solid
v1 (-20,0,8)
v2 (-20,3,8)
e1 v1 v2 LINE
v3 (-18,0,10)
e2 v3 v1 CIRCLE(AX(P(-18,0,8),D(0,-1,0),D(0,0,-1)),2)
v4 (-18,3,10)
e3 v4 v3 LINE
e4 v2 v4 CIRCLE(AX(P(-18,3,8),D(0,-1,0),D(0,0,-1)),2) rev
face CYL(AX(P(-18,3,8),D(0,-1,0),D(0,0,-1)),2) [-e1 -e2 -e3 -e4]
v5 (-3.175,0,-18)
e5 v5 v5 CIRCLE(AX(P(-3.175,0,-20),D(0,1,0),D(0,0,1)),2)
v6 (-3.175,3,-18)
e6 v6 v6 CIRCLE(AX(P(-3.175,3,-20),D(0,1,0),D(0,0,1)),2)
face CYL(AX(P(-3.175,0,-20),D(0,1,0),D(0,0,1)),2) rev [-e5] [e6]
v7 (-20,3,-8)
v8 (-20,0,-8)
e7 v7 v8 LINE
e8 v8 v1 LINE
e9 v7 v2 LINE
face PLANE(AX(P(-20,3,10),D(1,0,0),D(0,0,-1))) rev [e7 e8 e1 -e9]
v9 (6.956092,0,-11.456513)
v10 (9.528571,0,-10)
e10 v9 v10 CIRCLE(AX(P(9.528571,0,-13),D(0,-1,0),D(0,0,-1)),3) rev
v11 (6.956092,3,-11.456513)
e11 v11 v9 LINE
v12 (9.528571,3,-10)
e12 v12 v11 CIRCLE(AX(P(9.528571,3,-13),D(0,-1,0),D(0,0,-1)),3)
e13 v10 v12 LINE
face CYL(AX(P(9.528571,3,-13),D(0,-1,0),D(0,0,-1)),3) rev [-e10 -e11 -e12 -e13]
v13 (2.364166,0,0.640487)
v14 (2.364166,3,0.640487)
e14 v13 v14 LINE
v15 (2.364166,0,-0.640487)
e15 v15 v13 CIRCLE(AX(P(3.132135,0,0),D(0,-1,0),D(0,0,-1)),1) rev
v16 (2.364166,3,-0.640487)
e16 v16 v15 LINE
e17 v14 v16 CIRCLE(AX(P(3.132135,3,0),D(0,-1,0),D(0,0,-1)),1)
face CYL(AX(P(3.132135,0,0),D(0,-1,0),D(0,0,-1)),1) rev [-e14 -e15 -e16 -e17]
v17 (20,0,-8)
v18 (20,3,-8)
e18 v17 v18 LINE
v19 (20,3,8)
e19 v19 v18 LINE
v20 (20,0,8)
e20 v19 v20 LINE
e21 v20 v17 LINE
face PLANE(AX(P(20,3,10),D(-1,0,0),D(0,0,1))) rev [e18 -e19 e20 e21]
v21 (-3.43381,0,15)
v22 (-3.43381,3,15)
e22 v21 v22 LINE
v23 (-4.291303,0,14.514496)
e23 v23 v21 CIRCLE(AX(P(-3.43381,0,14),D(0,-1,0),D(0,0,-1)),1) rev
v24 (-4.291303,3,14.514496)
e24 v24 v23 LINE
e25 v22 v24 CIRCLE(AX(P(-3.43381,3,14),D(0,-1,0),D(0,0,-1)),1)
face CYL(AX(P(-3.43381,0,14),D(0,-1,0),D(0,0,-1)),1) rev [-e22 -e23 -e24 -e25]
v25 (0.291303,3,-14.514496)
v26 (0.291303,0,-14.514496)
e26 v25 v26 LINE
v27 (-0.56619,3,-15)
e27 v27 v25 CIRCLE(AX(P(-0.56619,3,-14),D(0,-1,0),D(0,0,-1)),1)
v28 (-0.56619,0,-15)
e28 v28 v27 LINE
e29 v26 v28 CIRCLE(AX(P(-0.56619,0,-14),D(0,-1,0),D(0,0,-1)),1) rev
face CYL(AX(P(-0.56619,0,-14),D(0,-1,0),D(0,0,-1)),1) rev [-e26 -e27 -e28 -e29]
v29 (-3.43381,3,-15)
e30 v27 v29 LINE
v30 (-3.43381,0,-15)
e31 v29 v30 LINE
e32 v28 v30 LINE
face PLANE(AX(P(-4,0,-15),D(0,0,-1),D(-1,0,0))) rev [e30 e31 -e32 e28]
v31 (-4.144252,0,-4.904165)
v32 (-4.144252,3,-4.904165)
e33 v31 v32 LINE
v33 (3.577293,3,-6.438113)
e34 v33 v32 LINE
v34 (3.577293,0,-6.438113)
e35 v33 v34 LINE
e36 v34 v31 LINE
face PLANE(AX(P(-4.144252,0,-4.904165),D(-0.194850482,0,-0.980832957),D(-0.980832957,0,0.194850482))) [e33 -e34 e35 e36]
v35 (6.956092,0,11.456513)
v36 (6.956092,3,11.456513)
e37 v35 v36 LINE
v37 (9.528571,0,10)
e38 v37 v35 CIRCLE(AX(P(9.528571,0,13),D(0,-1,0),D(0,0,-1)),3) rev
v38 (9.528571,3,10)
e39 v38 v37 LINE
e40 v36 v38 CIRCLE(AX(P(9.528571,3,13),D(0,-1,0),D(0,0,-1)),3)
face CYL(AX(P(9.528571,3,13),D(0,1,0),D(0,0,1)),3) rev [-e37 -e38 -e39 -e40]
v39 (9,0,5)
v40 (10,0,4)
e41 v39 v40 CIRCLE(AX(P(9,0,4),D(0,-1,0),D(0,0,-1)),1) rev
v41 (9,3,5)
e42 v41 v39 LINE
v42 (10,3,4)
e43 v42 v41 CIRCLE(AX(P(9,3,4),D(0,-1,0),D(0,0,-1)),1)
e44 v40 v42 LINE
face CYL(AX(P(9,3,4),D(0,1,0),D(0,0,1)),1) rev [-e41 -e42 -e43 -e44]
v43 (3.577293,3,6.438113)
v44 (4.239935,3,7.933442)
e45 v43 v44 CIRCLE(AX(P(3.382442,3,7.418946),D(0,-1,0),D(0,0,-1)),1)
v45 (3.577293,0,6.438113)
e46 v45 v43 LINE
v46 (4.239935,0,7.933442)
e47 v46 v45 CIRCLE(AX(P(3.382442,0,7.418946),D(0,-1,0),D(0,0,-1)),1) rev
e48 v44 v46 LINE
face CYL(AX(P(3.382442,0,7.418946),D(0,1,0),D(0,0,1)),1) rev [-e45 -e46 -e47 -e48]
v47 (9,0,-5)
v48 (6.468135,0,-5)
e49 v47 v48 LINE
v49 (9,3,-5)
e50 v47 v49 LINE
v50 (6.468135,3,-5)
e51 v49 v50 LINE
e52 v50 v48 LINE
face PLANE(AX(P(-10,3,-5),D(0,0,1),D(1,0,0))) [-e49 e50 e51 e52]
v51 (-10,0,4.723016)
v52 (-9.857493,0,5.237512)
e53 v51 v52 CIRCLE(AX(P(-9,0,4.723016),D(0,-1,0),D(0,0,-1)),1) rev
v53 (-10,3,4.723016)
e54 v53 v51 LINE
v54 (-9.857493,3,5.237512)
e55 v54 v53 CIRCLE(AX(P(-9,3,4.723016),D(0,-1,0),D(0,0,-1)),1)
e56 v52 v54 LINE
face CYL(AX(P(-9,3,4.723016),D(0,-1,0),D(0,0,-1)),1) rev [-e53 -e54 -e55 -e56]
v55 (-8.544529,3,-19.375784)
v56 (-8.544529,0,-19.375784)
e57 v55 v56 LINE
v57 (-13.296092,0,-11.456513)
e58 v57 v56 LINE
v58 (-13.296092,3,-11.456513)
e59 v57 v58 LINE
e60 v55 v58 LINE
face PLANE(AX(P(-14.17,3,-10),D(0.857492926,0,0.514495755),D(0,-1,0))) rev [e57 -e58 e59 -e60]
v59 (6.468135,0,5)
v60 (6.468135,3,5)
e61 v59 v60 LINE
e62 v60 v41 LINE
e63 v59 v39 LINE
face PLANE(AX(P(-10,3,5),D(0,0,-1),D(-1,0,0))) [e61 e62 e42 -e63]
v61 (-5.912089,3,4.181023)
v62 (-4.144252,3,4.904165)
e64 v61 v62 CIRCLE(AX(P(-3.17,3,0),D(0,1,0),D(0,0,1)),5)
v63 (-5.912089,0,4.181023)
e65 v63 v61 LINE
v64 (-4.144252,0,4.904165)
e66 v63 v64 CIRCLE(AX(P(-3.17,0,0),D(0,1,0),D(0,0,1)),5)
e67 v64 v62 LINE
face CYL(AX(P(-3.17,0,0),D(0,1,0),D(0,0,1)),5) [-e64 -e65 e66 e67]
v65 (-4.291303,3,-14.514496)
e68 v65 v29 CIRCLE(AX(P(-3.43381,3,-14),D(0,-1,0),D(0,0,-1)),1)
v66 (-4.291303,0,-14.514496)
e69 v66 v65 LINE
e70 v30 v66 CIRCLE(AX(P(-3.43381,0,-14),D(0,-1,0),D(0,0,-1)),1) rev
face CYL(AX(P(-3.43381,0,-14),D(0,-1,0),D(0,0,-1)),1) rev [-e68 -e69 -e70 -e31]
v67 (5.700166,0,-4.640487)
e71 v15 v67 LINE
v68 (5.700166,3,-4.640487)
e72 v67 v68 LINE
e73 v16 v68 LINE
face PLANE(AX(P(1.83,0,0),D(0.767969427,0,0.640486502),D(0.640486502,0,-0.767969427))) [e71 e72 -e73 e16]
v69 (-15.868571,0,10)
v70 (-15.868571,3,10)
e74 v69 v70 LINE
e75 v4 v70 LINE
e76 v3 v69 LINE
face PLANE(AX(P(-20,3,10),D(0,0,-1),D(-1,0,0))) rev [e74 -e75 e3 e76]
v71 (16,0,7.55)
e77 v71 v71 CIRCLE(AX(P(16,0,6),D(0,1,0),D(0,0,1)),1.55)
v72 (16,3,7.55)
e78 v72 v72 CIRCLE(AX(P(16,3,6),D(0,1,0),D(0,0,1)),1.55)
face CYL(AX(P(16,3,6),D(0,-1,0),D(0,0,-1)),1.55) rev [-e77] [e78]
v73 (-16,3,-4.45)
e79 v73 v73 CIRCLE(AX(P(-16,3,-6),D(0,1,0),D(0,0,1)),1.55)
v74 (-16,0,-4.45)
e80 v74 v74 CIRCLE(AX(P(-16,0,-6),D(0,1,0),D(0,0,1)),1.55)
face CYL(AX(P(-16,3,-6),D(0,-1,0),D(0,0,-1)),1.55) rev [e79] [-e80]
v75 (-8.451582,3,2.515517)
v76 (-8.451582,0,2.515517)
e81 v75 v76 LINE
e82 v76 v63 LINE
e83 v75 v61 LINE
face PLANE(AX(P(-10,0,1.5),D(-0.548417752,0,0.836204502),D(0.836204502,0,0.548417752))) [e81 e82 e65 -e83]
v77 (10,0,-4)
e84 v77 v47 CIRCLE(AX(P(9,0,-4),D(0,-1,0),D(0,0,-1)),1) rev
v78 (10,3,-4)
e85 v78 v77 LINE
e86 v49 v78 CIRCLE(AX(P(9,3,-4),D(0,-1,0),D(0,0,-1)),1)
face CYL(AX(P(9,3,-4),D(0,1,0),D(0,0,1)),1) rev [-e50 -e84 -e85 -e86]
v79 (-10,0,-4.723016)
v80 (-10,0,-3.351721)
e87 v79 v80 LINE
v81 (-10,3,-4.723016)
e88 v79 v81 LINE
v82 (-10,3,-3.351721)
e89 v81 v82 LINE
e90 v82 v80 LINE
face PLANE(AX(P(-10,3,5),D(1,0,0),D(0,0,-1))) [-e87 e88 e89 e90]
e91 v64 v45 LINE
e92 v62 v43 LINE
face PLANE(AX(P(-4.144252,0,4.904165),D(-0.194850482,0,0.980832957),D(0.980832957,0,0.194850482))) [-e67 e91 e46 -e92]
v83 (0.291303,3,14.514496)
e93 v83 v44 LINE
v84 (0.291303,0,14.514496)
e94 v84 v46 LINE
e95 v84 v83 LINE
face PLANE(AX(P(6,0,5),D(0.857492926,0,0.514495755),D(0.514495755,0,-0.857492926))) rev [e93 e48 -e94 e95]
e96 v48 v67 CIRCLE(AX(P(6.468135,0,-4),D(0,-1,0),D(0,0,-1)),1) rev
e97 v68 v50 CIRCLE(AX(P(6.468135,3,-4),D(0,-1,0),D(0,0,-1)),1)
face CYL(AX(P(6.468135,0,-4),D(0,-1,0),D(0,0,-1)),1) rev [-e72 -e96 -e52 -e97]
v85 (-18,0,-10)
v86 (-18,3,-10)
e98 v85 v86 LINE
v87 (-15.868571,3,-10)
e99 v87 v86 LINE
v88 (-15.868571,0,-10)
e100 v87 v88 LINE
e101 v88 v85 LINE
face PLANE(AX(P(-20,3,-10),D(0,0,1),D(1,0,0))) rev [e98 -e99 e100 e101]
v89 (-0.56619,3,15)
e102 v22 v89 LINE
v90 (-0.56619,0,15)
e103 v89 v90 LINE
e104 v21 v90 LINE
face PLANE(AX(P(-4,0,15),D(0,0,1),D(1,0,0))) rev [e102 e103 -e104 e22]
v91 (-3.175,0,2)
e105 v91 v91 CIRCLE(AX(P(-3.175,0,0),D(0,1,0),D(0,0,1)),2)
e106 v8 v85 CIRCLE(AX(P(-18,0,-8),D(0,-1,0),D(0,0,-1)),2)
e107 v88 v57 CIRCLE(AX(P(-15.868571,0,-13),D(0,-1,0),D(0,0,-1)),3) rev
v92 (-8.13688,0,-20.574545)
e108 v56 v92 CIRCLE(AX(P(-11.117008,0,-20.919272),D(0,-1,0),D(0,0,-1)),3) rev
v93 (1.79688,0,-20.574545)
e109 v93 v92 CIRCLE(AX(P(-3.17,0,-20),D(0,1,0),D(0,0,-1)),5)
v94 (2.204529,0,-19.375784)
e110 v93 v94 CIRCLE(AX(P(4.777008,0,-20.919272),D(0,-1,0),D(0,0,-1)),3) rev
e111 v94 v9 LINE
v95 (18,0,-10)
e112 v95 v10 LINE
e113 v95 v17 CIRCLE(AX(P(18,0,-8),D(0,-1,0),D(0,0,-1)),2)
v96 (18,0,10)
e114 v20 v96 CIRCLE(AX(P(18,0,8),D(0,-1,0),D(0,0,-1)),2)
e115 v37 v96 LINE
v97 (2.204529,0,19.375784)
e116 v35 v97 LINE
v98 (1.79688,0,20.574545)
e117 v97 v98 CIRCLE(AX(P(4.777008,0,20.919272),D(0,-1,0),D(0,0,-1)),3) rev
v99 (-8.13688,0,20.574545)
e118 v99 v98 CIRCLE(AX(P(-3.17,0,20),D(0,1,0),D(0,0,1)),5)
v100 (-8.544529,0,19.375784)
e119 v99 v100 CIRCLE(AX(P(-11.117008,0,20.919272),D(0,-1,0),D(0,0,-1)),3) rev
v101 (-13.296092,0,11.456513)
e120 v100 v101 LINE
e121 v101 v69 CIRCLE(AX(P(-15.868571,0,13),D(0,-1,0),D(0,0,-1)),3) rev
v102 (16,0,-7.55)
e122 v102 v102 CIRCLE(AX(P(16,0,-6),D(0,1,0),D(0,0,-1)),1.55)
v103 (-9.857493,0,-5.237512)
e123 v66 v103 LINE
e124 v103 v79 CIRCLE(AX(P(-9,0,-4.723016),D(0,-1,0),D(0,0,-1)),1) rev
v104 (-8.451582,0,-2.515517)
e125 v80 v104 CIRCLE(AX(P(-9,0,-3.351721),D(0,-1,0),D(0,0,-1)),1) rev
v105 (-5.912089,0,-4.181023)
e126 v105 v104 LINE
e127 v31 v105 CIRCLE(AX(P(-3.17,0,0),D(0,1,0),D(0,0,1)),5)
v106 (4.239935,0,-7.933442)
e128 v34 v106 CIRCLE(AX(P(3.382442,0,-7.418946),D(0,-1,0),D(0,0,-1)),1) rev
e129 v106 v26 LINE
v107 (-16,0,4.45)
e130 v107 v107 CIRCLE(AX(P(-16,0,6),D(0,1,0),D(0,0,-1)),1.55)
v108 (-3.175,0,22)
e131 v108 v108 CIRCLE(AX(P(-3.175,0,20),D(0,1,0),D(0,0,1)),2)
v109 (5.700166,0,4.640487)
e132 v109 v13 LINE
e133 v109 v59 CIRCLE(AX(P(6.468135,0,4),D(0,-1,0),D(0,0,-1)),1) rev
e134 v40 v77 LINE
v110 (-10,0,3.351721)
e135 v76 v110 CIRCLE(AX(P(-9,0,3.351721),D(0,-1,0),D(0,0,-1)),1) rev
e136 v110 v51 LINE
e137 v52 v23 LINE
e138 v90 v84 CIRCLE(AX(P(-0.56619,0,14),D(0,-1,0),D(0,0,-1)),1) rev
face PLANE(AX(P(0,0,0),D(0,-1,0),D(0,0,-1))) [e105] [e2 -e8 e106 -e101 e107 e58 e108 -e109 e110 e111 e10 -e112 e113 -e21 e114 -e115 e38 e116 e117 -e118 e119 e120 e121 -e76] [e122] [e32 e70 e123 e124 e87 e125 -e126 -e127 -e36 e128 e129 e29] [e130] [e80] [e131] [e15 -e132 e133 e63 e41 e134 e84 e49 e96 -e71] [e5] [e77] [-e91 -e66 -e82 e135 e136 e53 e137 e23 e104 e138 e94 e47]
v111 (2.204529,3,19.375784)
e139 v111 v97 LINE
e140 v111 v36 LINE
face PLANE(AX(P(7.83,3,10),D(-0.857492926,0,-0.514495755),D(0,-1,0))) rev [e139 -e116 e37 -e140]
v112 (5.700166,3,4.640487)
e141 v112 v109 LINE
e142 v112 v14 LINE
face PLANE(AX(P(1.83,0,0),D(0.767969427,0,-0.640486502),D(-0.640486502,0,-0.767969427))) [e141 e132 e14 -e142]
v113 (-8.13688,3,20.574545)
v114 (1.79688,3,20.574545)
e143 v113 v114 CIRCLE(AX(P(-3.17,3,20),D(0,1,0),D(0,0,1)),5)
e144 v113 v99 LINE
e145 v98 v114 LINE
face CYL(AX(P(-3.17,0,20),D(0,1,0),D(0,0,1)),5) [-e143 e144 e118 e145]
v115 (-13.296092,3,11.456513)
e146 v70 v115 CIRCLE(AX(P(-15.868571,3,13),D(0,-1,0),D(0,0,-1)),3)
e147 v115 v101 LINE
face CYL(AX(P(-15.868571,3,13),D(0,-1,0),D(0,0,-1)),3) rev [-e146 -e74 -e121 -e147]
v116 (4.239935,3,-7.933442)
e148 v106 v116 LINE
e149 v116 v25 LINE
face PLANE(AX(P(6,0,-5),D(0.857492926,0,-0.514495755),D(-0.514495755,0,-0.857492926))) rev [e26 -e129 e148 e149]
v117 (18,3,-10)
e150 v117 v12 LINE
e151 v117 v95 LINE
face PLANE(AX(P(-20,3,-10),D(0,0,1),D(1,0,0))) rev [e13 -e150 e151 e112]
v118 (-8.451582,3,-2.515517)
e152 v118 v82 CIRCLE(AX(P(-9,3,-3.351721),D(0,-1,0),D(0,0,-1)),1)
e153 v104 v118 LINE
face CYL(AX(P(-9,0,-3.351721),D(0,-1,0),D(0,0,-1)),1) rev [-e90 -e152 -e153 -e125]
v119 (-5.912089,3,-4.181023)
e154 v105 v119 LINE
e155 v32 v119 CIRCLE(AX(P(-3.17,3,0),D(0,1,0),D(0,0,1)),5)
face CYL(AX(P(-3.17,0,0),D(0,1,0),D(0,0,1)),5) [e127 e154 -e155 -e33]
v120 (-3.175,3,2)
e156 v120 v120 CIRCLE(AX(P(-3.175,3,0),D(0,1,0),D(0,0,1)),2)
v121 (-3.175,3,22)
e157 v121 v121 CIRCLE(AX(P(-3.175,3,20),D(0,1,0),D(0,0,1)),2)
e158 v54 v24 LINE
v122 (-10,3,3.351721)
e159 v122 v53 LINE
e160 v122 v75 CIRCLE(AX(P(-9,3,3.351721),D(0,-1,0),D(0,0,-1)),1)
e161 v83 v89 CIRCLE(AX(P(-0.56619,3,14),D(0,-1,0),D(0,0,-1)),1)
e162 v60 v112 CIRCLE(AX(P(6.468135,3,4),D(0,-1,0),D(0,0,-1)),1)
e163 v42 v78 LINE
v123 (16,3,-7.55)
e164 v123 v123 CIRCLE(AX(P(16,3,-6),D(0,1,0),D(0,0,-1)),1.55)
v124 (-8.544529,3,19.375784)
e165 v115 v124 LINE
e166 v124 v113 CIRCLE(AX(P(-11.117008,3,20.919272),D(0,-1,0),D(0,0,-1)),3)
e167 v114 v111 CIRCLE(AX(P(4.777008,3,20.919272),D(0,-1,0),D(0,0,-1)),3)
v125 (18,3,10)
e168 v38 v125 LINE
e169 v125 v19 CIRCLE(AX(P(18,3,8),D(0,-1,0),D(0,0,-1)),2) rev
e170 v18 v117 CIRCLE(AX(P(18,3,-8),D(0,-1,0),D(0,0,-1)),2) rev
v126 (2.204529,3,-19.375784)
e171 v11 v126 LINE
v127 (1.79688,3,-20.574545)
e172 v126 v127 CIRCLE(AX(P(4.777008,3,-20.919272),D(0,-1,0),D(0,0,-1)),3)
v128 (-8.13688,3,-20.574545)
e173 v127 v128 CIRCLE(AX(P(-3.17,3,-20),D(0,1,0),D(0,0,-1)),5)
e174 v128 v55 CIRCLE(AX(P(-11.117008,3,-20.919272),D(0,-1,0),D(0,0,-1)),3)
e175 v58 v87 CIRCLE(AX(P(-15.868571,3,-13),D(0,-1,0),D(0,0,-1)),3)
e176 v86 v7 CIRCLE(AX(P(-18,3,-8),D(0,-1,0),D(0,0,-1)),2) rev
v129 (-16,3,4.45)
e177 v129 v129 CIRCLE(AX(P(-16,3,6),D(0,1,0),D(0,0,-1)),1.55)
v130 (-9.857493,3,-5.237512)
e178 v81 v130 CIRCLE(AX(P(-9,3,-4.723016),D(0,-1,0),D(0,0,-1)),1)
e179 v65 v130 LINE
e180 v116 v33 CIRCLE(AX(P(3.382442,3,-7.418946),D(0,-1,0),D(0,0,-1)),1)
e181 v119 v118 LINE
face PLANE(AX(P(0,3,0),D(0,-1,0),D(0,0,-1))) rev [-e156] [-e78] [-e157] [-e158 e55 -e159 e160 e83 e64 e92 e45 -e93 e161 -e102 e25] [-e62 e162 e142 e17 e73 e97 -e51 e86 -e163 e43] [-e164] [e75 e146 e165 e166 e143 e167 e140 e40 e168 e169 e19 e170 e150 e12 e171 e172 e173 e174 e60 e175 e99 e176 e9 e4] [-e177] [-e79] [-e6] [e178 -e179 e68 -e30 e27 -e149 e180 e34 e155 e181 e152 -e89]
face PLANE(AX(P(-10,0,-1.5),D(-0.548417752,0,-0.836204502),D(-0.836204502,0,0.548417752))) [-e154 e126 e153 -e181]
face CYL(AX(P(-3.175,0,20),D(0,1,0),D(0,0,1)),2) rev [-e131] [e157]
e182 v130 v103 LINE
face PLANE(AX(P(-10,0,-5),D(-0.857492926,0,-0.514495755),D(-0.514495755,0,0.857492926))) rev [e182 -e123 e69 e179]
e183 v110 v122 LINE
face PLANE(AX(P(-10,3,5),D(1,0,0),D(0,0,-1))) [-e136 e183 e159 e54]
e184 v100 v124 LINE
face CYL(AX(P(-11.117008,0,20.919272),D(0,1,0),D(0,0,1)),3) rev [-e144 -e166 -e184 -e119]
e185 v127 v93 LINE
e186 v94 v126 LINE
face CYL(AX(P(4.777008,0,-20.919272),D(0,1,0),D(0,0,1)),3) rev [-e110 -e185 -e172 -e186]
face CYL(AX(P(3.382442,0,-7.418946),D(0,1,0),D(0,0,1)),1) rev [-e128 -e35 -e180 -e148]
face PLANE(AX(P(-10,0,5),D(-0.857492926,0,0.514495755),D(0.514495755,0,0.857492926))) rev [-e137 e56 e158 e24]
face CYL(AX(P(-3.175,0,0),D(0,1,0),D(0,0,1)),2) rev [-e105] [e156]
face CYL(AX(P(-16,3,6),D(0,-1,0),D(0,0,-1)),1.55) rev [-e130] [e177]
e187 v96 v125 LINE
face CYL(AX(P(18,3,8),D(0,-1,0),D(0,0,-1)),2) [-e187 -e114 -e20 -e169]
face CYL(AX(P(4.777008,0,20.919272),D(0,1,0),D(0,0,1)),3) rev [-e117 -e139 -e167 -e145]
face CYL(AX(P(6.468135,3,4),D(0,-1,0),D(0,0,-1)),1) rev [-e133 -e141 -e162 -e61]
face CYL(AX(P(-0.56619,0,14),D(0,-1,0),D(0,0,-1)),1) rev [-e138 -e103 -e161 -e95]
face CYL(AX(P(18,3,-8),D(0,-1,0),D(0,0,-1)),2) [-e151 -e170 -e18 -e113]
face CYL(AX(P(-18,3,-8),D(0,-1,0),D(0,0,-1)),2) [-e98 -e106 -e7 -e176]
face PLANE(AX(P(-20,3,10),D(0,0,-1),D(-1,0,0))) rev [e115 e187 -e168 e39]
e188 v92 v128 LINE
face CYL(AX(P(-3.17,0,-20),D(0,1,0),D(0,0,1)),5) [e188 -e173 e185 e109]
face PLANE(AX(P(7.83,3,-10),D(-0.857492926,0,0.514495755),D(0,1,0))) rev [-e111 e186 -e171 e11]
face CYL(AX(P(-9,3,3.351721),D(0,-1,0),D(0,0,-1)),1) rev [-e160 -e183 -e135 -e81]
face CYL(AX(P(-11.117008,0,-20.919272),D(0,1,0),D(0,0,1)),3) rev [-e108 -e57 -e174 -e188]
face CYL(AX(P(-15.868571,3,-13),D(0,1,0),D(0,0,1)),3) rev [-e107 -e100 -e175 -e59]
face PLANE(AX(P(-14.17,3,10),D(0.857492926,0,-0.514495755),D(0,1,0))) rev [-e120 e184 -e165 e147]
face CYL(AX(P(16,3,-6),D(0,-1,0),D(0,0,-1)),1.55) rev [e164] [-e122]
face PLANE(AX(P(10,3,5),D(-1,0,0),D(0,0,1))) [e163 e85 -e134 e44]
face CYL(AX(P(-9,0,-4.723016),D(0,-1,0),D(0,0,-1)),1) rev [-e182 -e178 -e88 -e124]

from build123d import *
from OCP.BRepFilletAPI import BRepFilletAPI_MakeChamfer

# Parameters (mm, degrees)
SKETCH_1_W           = 40
SKETCH_1_H           = 20
SKETCH_1_R           = 1.55
SKETCH_1_W_2         = 20
SKETCH_1_H_2         = 10
EXTRUDE_1_DEPTH      = 3
SKETCH_2_R           = 2
EXTRUDE_2_DEPTH      = 3
FILLET_1_R           = 2
SKETCH_3_W           = 10
SKETCH_3_H           = 10
CUT_EXTRUDE_1_DEPTH  = 33.155870382
CHAMFER_1_SIZE       = 6
CHAMFER_1_SIZE_2     = 10
FILLET_2_OUTLINE_R   = 2
FILLET_2_OUTLINE_R_2 = 1.55
FILLET_2_OUTLINE_W   = 20
FILLET_2_OUTLINE_H   = 10
FILLET_2_DEPTH       = 3
CUT_EXTRUDE_2_DEPTH  = 33.155870382
SKETCH_5_R           = 2
EXTRUDE_3_DEPTH      = 3
FILLET_3_R           = 1
SKETCH_6_R           = 2
EXTRUDE_4_DEPTH      = 3
SKETCH_7_R           = 2
CUT_EXTRUDE_3_DEPTH  = 33.155870382


with BuildPart() as part:
    # 草图1 → 凸台-拉伸1 (new body)
    with BuildSketch(Plane(origin=(0, 0, 0), x_dir=(1, 0, 0), z_dir=(0, 1, 0))):
        Rectangle(SKETCH_1_W, SKETCH_1_H)
        with Locations(Location((-16, 6, 0), (0, 0, 270))):
            Circle(SKETCH_1_R, mode=Mode.SUBTRACT)
        with Locations(Location((16, 6, 0), (0, 0, 90))):
            Circle(SKETCH_1_R, mode=Mode.SUBTRACT)
        with Locations(Location((16, -6, 0), (0, 0, 270))):
            Circle(SKETCH_1_R, mode=Mode.SUBTRACT)
        with Locations(Location((-16, -6, 0), (0, 0, 90))):
            Circle(SKETCH_1_R, mode=Mode.SUBTRACT)
        Rectangle(SKETCH_1_W_2, SKETCH_1_H_2, mode=Mode.SUBTRACT)
    extrude(amount=EXTRUDE_1_DEPTH)

    # 草图2 → 凸台-拉伸2 (add, through all)
    with BuildSketch(Plane(origin=(0, 3, 0), x_dir=(1, 0, 0), z_dir=(0, 1, 0))):
        with BuildLine():
            Line((-8.17, 20), (-8.17, -20))
            ThreePointArc((-8.17, -20), (-3.17, -25), (1.83, -20))
            Line((1.83, -20), (1.83, 20))
            ThreePointArc((1.83, 20), (-3.17, 25), (-8.17, 20))
        make_face()
        with Locations(Location((-3.17, 20, 0), (0, 0, 270))):
            Circle(SKETCH_2_R, mode=Mode.SUBTRACT)
        with Locations(Location((-3.17, -20, 0), (0, 0, 270))):
            Circle(SKETCH_2_R, mode=Mode.SUBTRACT)
    extrude(amount=-EXTRUDE_2_DEPTH)

    # 圆角1
    fillet_1_edges = [part.edges().sort_by_distance(p)[0] for p in [
        (20, 1.5, 10),
        (-20, 1.5, 10),
        (-20, 1.5, -10),
        (20, 1.5, -10),
    ]]
    fillet(fillet_1_edges, radius=FILLET_1_R)

    # 草图3 → 切除-拉伸1 (cut, through all)
    with BuildSketch(Plane(origin=(0, 3, 0), x_dir=(1, 0, 0), z_dir=(0, 1, 0))):
        with Locations((-3.17, 0)):
            Rectangle(SKETCH_3_W, SKETCH_3_H)
    extrude(amount=-CUT_EXTRUDE_1_DEPTH, mode=Mode.SUBTRACT)

    # 倒角1
    chamfer_1_edges_1 = [part.edges().sort_by_distance(p)[0] for p in [
        (-8.17, 1.5, 10),
    ]]
    chamfer_1_side_1 = [part.faces().sort_by_distance(p)[0] for p in [
        (-8.29, 1.5, 10),
    ]]
    chamfer_1_edges_2 = [part.edges().sort_by_distance(p)[0] for p in [
        (1.83, 1.5, 10),
    ]]
    chamfer_1_side_2 = [part.faces().sort_by_distance(p)[0] for p in [
        (1.95, 1.5, 10),
    ]]
    chamfer_1_edges_3 = [part.edges().sort_by_distance(p)[0] for p in [
        (1.83, 1.5, -10),
    ]]
    chamfer_1_side_3 = [part.faces().sort_by_distance(p)[0] for p in [
        (1.83, 1.5, -10.12),
    ]]
    chamfer_1_edges_4 = [part.edges().sort_by_distance(p)[0] for p in [
        (-8.17, 1.5, -10),
    ]]
    chamfer_1_side_4 = [part.faces().sort_by_distance(p)[0] for p in [
        (-8.29, 1.5, -10),
    ]]
    chamfer_1 = BRepFilletAPI_MakeChamfer(part.part.solid().wrapped)
    for e in chamfer_1_edges_1:
        chamfer_1.Add(CHAMFER_1_SIZE - 0.0001, CHAMFER_1_SIZE_2 - 0.0001, e.wrapped, chamfer_1_side_1[0].wrapped)
    for e in chamfer_1_edges_2:
        chamfer_1.Add(CHAMFER_1_SIZE - 0.0001, CHAMFER_1_SIZE_2 - 0.0001, e.wrapped, chamfer_1_side_2[0].wrapped)
    for e in chamfer_1_edges_3:
        chamfer_1.Add(CHAMFER_1_SIZE_2 - 0.0001, CHAMFER_1_SIZE - 0.0001, e.wrapped, chamfer_1_side_3[0].wrapped)
    for e in chamfer_1_edges_4:
        chamfer_1.Add(CHAMFER_1_SIZE - 0.0001, CHAMFER_1_SIZE_2 - 0.0001, e.wrapped, chamfer_1_side_4[0].wrapped)
    add(Compound.cast(chamfer_1.Shape()), mode=Mode.REPLACE)  # a hair under: the kernel refuses the full size

    # 圆角2: read off the stored shape, not the designer's step
    # 圆角2 outline → 圆角2 (add)
    with BuildSketch(Plane(origin=(0, 0, 0), x_dir=(1, 0, 0), z_dir=(0, 1, 0))):
        with BuildLine():
            ThreePointArc((18, -10), (19.414213562, -9.414213562), (20, -8))
            Line((20, -8), (20, 8))
            ThreePointArc((20, 8), (19.414213562, 9.414213562), (18, 10))
            Line((18, 10), (9.528571137, 10))
            ThreePointArc((9.528571137, 10), (8.050474692, 10.38940028), (6.95609236, 11.456512734))
            Line((6.95609236, 11.456512734), (2.204529459, 19.375784235))
            ThreePointArc((2.204529459, 19.375784235), (1.9367411, 19.953413027), (1.796880148, 20.574544688))
            ThreePointArc((1.796880148, 20.574544688), (-3.17, 25), (-8.136880148, 20.574544688))
            ThreePointArc((-8.136880148, 20.574544688), (-8.2767411, 19.953413027), (-8.544529459, 19.375784235))
            Line((-8.544529459, 19.375784235), (-13.29609236, 11.456512734))
            ThreePointArc((-13.29609236, 11.456512734), (-14.390474692, 10.38940028), (-15.868571137, 10))
            Line((-15.868571137, 10), (-18, 10))
            ThreePointArc((-18, 10), (-19.414213562, 9.414213562), (-20, 8))
            Line((-20, 8), (-20, -8))
            ThreePointArc((-20, -8), (-19.414213562, -9.414213562), (-18, -10))
            Line((-18, -10), (-15.868571137, -10))
            ThreePointArc((-15.868571137, -10), (-14.390474692, -10.38940028), (-13.29609236, -11.456512734))
            Line((-13.29609236, -11.456512734), (-8.544529459, -19.375784235))
            ThreePointArc((-8.544529459, -19.375784235), (-8.2767411, -19.953413027), (-8.136880148, -20.574544688))
            ThreePointArc((-8.136880148, -20.574544688), (-3.17, -25), (1.796880148, -20.574544688))
            ThreePointArc((1.796880148, -20.574544688), (1.9367411, -19.953413027), (2.204529459, -19.375784235))
            Line((2.204529459, -19.375784235), (6.95609236, -11.456512734))
            ThreePointArc((6.95609236, -11.456512734), (8.050474692, -10.38940028), (9.528571137, -10))
            Line((9.528571137, -10), (18, -10))
        make_face()
        with Locations((-3.17, -20)):
            Circle(FILLET_2_OUTLINE_R, mode=Mode.SUBTRACT)
        with Locations((-16, -6)):
            Circle(FILLET_2_OUTLINE_R_2, mode=Mode.SUBTRACT)
        with Locations((16, -6)):
            Circle(FILLET_2_OUTLINE_R_2, mode=Mode.SUBTRACT)
        with Locations((-16, 6)):
            Circle(FILLET_2_OUTLINE_R_2, mode=Mode.SUBTRACT)
        with Locations((-3.17, 20)):
            Circle(FILLET_2_OUTLINE_R, mode=Mode.SUBTRACT)
        Rectangle(FILLET_2_OUTLINE_W, FILLET_2_OUTLINE_H, mode=Mode.SUBTRACT)
        with Locations((16, 6)):
            Circle(FILLET_2_OUTLINE_R_2, mode=Mode.SUBTRACT)
    extrude(amount=FILLET_2_DEPTH)

    # 草图4 → 切除-拉伸2 (cut, through all)
    with BuildSketch(Plane(origin=(0, 3, 0), x_dir=(1, 0, 0), z_dir=(0, 1, 0))):
        Polygon((-10, 5), (-4, 15), (0, 15), (6, 5), align=None)
        Polygon((-10, -5), (6, -5), (0, -15), (-4, -15), align=None)
    extrude(amount=-CUT_EXTRUDE_2_DEPTH, mode=Mode.SUBTRACT)

    # 草图5 → 凸台-拉伸3 (add, through all)
    with BuildSketch(Plane(origin=(0, 3, 0), x_dir=(1, 0, 0), z_dir=(0, 1, 0))):
        with BuildLine():
            Line((-10, 1.5), (-5.912088761, 4.18102251))
            ThreePointArc((-5.912088761, 4.18102251), (-5.06302182, 4.627793036), (-4.144252411, 4.904164785))
            Line((-4.144252411, 4.904164785), (4.971008489, 6.714985851))
            Line((4.971008489, 6.714985851), (6, 5))
            Line((6, 5), (1.83, 0))
            Line((1.83, 0), (6, -5))
            Line((6, -5), (4.971008489, -6.714985851))
            Line((4.971008489, -6.714985851), (-4.144252411, -4.904164785))
            ThreePointArc((-4.144252411, -4.904164785), (-5.06302182, -4.627793036), (-5.912088761, -4.18102251))
            Line((-5.912088761, -4.18102251), (-10, -1.5))
            Line((-10, -1.5), (-10, 1.5))
        make_face()
        with Locations(Location((-3.17, 0, 0), (0, 0, 270))):
            Circle(SKETCH_5_R, mode=Mode.SUBTRACT)
    extrude(amount=-EXTRUDE_3_DEPTH)

    # 圆角3
    fillet_3_edges = [part.edges().sort_by_distance(p)[0] for p in [
        (6, 1.5, -5),
        (-4, 1.5, -15),
        (0, 1.5, -15),
        (-4, 1.5, 15),
        (6, 1.5, 5),
        (0, 1.5, 15),
        (-10, 1.5, 1.5),
        (-10, 1.5, -1.5),
        (4.971008489, 1.5, -6.714985851),
        (1.83, 1.5, 0),
        (4.971008489, 1.5, 6.714985851),
        (10, 1.5, 5),
        (10, 1.5, -5),
        (-10, 1.5, -5),
        (-10, 1.5, 5),
    ]]
    fillet(fillet_3_edges, radius=FILLET_3_R)

    # 草图6 → 凸台-拉伸4 (add, through all)
    with BuildSketch(Plane(origin=(0, 3, 0), x_dir=(1, 0, 0), z_dir=(0, 1, 0))):
        with Locations((-3.17, -20)):
            Circle(SKETCH_6_R)
        with Locations((-3.17, 0)):
            Circle(SKETCH_6_R)
        with Locations((-3.17, 20)):
            Circle(SKETCH_6_R)
    extrude(amount=-EXTRUDE_4_DEPTH)

    # 草图7 → 切除-拉伸3 (cut, through all)
    with BuildSketch(Plane(origin=(0, 3, 0), x_dir=(1, 0, 0), z_dir=(0, 1, 0))):
        with Locations(Location((-3.175, 20, 0), (0, 0, 270))):
            Circle(SKETCH_7_R)
        with Locations(Location((-3.175, 0, 0), (0, 0, 270))):
            Circle(SKETCH_7_R)
        with Locations(Location((-3.175, -20, 0), (0, 0, 270))):
            Circle(SKETCH_7_R)
    extrude(amount=-CUT_EXTRUDE_3_DEPTH, mode=Mode.SUBTRACT)


solid = part.part
